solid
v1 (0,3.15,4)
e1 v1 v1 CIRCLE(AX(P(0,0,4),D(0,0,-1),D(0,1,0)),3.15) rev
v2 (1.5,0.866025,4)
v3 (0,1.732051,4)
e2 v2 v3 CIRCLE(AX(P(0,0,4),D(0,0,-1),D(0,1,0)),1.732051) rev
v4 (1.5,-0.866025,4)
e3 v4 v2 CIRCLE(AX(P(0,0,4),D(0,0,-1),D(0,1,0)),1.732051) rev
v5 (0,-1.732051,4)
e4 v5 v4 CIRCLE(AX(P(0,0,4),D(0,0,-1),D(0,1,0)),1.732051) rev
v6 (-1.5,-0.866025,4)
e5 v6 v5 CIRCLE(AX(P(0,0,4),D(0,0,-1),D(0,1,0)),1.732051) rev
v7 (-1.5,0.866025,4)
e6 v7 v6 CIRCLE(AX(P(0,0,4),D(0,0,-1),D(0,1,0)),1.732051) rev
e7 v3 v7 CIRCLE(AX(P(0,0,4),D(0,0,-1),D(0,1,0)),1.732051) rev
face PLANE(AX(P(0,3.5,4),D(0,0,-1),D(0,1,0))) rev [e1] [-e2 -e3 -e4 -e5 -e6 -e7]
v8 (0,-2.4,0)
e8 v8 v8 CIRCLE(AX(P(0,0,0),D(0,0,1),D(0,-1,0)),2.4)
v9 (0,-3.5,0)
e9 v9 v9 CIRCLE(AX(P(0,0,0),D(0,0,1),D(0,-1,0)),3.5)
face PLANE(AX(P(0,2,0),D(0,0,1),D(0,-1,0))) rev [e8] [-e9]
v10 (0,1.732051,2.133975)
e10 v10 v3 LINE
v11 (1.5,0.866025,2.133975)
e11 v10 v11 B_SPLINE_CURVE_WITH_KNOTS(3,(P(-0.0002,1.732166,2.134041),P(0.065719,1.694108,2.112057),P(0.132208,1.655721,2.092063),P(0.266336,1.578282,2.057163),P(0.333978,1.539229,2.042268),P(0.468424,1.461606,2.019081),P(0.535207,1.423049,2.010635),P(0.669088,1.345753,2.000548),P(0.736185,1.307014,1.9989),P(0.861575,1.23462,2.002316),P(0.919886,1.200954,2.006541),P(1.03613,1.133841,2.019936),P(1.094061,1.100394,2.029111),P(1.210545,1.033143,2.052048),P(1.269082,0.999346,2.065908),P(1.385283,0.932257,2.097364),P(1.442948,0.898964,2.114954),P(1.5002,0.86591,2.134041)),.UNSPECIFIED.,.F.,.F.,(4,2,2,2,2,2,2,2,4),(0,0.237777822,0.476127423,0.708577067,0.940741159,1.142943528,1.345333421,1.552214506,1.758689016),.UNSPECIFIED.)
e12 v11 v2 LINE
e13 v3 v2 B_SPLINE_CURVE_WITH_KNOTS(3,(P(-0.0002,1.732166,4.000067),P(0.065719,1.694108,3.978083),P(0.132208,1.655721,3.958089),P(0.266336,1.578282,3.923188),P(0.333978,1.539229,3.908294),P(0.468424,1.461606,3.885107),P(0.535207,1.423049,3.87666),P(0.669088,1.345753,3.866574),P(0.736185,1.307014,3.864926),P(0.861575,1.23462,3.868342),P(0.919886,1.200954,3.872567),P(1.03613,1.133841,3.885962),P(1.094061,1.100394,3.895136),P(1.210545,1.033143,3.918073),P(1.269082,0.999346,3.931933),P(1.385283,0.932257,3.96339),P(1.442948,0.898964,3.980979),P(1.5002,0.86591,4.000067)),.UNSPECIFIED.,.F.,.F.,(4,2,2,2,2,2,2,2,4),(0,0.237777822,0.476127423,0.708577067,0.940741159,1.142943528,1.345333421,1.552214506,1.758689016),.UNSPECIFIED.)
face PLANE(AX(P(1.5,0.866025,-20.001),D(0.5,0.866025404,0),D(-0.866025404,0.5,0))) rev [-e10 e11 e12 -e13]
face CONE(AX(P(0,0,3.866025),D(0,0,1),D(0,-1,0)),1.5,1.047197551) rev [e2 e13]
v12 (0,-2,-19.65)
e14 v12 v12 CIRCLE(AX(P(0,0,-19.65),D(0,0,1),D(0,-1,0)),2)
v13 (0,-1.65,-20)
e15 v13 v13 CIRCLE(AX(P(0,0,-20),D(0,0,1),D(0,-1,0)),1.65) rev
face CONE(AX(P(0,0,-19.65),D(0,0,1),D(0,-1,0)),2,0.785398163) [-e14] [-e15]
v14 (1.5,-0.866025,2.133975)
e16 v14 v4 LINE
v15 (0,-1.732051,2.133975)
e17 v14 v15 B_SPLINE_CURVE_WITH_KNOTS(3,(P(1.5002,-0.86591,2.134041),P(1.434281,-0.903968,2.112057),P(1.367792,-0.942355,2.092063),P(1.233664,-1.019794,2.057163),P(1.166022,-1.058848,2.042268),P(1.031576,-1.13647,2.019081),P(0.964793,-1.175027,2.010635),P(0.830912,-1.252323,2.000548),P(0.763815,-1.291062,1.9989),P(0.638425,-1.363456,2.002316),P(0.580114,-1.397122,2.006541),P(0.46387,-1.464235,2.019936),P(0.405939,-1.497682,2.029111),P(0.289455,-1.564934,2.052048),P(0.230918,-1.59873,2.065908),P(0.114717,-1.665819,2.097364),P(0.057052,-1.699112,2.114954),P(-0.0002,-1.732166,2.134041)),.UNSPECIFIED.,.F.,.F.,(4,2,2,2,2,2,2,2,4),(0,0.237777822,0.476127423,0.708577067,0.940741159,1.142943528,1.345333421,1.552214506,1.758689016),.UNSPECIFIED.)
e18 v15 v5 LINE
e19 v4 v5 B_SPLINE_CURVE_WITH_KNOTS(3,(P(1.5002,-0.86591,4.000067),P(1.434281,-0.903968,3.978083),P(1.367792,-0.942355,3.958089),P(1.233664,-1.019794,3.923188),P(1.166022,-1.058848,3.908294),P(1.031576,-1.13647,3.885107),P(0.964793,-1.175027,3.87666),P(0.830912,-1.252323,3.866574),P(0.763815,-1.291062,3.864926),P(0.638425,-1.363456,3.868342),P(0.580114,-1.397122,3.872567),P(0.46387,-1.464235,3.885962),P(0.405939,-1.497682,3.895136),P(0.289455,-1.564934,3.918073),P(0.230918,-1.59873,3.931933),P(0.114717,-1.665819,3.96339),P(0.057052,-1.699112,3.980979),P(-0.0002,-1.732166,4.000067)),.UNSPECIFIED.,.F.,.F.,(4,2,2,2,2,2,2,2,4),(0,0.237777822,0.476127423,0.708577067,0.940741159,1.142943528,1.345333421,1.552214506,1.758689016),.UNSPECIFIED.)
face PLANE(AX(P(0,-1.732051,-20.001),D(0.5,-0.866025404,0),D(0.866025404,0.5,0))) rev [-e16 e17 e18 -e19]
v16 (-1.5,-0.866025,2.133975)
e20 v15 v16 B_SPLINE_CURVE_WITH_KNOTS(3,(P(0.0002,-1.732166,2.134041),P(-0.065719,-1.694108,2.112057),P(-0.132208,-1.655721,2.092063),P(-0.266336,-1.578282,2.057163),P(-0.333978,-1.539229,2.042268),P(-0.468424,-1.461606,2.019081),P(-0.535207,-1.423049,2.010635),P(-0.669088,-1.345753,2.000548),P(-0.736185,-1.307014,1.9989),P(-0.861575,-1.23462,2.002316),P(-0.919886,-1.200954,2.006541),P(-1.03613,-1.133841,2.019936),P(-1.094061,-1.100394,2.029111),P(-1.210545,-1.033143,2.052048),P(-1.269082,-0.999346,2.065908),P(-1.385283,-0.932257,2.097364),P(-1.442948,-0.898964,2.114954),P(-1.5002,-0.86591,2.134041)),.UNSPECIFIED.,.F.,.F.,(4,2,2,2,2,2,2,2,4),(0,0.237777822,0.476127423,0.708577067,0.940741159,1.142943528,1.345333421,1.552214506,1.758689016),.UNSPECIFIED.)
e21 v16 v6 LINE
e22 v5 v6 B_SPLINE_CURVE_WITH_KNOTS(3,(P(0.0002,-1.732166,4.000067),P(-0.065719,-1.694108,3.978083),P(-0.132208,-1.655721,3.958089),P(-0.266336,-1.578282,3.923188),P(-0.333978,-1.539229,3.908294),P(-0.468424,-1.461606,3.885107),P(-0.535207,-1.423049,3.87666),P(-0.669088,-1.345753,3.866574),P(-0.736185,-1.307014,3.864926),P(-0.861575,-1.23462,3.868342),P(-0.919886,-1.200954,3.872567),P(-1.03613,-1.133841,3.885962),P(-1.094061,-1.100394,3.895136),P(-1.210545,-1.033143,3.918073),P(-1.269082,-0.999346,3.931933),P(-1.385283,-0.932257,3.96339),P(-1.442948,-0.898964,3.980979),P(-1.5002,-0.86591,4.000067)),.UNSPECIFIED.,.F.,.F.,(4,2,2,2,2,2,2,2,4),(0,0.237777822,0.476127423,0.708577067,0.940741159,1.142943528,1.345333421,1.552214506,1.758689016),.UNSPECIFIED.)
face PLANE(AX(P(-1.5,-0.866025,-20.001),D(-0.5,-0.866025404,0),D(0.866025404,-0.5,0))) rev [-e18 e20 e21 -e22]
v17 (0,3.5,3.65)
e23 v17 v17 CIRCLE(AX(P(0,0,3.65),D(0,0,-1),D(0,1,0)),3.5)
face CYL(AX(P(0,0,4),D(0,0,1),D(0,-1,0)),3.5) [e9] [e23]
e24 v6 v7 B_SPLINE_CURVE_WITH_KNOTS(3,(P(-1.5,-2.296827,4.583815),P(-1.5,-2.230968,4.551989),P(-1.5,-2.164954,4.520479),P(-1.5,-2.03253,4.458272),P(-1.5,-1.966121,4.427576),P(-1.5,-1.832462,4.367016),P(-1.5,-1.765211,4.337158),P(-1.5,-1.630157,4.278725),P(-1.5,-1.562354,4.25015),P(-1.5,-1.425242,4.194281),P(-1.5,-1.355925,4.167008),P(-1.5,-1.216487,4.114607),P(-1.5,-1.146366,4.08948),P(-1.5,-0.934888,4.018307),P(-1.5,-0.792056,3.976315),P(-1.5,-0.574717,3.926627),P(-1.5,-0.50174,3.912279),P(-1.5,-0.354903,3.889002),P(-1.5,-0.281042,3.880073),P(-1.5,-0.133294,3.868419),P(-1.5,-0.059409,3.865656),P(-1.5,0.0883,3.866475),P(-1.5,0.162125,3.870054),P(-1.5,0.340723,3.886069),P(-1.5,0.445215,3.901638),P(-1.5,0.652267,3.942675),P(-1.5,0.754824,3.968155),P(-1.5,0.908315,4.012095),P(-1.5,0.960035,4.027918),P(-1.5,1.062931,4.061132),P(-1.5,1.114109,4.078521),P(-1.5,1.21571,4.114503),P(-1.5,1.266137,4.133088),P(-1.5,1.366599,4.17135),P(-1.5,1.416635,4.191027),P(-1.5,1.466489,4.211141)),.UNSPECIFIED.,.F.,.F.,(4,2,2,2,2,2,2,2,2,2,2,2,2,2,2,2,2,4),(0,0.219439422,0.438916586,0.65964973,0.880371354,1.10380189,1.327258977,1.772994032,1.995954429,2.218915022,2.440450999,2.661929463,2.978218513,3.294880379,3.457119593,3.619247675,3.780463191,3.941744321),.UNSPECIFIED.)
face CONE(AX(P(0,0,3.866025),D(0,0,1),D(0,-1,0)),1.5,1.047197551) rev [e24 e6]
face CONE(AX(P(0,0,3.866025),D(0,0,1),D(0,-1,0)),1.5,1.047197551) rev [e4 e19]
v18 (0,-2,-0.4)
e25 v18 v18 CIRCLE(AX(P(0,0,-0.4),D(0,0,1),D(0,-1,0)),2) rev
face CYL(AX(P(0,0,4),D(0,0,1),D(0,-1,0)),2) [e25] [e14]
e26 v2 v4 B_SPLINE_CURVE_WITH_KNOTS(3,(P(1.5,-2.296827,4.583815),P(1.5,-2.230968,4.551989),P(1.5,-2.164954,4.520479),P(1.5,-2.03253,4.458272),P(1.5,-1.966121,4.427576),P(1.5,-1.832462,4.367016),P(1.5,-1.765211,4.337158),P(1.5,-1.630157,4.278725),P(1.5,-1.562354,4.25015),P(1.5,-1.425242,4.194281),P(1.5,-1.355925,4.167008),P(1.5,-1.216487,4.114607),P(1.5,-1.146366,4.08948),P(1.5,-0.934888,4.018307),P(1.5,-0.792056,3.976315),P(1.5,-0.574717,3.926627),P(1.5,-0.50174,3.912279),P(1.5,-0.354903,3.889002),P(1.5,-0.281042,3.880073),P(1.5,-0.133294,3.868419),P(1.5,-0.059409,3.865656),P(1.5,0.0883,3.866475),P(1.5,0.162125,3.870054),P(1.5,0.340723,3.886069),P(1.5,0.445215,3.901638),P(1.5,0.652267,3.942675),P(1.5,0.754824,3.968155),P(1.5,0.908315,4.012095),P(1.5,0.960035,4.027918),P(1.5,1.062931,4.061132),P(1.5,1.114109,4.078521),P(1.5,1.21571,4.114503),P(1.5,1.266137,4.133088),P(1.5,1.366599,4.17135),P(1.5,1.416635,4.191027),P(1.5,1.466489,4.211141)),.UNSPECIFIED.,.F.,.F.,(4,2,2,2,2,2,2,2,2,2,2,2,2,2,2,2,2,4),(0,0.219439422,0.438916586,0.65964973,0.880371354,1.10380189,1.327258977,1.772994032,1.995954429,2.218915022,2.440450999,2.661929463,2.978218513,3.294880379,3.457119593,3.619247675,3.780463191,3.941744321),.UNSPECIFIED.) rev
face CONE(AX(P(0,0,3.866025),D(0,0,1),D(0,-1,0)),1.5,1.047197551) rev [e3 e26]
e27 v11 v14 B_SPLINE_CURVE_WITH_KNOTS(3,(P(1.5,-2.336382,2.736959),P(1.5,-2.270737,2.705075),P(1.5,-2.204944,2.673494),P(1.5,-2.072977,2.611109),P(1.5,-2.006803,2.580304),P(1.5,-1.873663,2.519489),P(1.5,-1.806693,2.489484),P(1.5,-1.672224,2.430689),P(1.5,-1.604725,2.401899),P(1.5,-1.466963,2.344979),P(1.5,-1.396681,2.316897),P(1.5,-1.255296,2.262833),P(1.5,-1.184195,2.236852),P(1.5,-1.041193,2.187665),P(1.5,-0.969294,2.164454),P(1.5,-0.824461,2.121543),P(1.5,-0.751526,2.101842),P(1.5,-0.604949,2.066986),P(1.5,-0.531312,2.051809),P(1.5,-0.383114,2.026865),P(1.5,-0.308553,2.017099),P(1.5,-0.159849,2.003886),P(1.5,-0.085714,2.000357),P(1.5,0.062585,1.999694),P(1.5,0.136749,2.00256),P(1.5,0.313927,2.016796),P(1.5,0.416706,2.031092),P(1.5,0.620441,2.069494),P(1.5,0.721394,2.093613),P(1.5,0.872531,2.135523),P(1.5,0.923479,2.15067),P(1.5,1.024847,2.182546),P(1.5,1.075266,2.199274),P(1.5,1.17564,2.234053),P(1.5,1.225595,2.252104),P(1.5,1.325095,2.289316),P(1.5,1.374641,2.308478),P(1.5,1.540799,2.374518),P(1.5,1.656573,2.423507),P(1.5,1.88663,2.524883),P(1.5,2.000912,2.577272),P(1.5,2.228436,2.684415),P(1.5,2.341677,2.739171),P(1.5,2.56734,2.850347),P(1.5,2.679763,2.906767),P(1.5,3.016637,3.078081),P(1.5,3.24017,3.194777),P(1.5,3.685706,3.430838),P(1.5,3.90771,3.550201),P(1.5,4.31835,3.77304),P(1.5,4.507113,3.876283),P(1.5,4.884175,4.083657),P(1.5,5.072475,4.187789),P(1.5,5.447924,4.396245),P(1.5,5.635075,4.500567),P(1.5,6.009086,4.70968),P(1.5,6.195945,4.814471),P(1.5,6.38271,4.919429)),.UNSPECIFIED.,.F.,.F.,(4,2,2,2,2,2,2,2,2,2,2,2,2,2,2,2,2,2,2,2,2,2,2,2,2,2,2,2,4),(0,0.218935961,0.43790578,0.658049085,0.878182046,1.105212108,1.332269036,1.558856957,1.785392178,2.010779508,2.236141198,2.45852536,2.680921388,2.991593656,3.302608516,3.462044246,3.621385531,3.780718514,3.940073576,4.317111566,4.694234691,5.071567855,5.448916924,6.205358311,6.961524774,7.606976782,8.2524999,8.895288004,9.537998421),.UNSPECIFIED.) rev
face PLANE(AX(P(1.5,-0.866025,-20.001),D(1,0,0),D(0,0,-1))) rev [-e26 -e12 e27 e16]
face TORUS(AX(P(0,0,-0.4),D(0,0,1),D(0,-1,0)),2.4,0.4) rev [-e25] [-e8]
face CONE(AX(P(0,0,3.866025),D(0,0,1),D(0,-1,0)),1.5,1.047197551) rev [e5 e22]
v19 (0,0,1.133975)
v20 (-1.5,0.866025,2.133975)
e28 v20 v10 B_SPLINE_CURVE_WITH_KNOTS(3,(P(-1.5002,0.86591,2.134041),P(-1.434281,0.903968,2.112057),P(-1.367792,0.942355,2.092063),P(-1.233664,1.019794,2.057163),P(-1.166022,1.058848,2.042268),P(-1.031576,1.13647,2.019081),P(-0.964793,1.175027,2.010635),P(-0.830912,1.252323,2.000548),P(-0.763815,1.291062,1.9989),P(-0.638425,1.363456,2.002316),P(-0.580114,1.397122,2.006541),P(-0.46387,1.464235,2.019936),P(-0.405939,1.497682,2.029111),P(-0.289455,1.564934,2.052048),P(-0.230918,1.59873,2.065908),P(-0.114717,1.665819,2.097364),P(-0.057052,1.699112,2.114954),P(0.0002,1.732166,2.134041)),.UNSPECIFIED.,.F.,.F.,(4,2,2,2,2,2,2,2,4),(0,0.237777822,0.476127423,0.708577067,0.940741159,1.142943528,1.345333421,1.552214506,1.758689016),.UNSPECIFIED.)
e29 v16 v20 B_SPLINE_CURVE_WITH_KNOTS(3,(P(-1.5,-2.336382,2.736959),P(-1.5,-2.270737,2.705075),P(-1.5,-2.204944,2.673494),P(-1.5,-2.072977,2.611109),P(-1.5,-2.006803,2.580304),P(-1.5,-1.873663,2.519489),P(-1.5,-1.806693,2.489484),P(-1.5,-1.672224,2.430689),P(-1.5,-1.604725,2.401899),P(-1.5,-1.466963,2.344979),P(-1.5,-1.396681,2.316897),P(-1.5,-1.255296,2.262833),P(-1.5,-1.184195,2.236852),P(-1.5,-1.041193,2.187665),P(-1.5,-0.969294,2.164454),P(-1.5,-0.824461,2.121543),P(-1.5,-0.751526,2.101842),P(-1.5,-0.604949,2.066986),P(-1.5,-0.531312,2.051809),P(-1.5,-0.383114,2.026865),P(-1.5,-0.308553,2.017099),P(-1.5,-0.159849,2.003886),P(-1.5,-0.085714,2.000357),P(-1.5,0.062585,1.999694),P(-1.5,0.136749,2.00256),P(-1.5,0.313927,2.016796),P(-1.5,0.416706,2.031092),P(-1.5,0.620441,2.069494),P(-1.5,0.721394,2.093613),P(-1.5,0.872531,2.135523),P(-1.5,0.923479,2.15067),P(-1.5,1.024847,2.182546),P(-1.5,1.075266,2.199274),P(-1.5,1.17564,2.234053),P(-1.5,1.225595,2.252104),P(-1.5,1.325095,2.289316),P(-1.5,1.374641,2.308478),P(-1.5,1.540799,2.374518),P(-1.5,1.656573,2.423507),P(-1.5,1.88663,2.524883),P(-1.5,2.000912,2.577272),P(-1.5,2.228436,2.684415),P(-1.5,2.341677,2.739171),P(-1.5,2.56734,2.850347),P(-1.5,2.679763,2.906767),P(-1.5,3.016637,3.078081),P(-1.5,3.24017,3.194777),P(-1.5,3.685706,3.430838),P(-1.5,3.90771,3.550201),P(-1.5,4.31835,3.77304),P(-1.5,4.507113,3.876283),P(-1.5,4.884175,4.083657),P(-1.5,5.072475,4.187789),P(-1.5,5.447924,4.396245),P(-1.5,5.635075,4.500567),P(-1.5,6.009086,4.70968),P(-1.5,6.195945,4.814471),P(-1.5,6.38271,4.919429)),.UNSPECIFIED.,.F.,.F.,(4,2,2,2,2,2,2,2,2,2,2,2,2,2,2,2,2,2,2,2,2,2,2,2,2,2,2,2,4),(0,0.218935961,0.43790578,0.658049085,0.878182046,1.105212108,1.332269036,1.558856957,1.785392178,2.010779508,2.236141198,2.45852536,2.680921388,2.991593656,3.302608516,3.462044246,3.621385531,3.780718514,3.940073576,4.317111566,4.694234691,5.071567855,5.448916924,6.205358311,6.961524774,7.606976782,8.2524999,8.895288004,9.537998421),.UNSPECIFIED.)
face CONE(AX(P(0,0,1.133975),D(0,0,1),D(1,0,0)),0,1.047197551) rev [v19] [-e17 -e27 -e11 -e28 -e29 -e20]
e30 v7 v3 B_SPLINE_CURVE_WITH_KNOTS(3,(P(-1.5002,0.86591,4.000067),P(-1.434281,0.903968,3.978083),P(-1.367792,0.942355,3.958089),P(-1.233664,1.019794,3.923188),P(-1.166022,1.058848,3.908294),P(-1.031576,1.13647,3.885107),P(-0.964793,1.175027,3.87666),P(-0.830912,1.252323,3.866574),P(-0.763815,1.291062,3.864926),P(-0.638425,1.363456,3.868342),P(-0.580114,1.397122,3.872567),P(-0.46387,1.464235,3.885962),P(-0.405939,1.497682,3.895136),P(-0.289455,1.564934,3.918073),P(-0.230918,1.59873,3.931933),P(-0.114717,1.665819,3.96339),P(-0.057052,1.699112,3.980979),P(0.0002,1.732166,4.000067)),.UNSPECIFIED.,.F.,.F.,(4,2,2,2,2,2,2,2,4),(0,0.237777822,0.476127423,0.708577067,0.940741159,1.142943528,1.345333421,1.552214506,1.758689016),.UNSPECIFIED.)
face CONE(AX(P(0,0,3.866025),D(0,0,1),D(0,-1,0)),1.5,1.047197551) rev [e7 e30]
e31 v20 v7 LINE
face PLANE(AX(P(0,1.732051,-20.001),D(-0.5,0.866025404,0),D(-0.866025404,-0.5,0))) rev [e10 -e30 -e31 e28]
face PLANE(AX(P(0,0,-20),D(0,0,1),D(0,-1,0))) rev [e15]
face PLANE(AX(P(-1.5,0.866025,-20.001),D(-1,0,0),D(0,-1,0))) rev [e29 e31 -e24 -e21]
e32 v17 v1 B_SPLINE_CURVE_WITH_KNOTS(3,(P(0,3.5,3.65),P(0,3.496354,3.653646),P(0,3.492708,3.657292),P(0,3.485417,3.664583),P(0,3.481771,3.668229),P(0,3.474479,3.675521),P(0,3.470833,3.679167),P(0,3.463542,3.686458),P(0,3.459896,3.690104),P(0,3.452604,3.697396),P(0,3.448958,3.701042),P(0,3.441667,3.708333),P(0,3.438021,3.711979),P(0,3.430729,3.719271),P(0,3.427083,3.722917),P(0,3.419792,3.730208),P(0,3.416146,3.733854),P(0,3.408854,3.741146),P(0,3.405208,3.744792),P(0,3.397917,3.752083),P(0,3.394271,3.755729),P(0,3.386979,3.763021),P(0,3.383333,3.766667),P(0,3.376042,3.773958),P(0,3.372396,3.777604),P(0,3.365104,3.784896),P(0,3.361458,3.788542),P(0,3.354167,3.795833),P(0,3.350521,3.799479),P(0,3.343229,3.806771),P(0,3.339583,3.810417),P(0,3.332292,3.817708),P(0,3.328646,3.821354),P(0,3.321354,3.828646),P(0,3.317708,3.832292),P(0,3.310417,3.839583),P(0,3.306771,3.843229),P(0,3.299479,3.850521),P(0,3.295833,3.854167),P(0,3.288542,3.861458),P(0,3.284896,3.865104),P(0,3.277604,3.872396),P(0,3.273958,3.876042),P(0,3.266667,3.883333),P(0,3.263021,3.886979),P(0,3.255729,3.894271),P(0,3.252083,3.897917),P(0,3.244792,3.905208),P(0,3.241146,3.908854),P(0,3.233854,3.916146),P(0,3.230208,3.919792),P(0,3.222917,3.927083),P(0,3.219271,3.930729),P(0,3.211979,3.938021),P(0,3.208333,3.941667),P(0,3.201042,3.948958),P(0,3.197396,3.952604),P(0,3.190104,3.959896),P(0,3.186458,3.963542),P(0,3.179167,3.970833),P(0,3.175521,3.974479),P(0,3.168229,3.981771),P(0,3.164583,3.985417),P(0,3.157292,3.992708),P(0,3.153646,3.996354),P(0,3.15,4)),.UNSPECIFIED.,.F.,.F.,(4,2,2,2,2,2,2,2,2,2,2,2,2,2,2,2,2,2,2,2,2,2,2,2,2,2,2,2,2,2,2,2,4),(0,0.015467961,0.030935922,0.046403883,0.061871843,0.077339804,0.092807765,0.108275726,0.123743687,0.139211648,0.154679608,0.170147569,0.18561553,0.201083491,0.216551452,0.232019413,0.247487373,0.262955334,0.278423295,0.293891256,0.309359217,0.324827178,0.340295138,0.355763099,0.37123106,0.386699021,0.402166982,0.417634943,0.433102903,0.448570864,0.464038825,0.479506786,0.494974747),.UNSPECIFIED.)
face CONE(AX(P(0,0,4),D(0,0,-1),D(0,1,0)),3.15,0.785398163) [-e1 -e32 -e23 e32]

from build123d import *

# Parameters (mm, degrees)
CHAMFER1_SIZE      = 0.35
CUT_EXTRUDE1_REACH = 26.505
FILLET2_R          = 0.4


with BuildPart() as part:
    # Sketch1 → Revolve1 (revolve)
    with BuildSketch(Plane(origin=(0, 0, 0), x_dir=(0, 0, -1), z_dir=(1, 0, 0))):
        Polygon((0, 3.5), (-4, 3.5), (-4, 0), (20, 0), (20, 2), (0, 2), align=None)
    revolve(axis=Axis((0, 0, 4), (0, 0, -1)))

    # Sketch7 → Cut-Revolve2 (revolve, cut)
    with BuildSketch(Plane(origin=(0, 0, 0), x_dir=(0, 0, -1), z_dir=(1, 0, 0))):
        Polygon((-4, 0), (-4, 1.5), (-2, 1.5), (-1.133974596, 0), align=None)
    revolve(axis=Axis((0, 0, 4), (0, 0, -1)), mode=Mode.SUBTRACT)

    # Chamfer1
    chamfer1_edges = [part.edges().sort_by_distance(p)[0] for p in [
        (0, -2, -20),
        (0, -3.5, 4),
    ]]
    chamfer(chamfer1_edges, length=CHAMFER1_SIZE)

    # Cut-Extrude1: up to this cone (the profile starts inside it)
    cut_extrude1_end = Plane(origin=(0, 0, 4), z_dir=(0, 0, 1)).offset(-2.866024404) * Cone(1.732e-06, 60.336209885, 34.835126019, align=(Align.CENTER, Align.CENTER, Align.MIN), mode=Mode.PRIVATE)
    # Sketch8 → Cut-Extrude1 (cut, up to the surface)
    with BuildSketch(Plane.XY.offset(4), mode=Mode.PRIVATE) as cut_extrude1_sk1:
        Polygon((0, 1.732050808), (-1.5, 0.866025404), (-1.5, -0.866025404), (0, -1.732050808), (1.5, -0.866025404), (1.5, 0.866025404), align=None)
    cut_extrude1_tool1 = extrude(cut_extrude1_sk1.sketch, amount=-CUT_EXTRUDE1_REACH, mode=Mode.PRIVATE) & cut_extrude1_end
    add(cut_extrude1_tool1.solids().sort_by_distance((0, 0, 4))[0], mode=Mode.SUBTRACT)

    # Sketch9 → Cut-Revolve3 (revolve, cut)
    with BuildSketch(Plane(origin=(0, 0, 0), x_dir=(0, 0, -1), z_dir=(1, 0, 0))):
        Polygon((-4.5, 2.598076211), (-4.5, 1.5), (-3.866025404, 1.5), align=None)
    revolve(axis=Axis((0, 0, 4), (0, 0, -1)), mode=Mode.SUBTRACT)

    # Fillet2
    fillet2_edges = [part.edges().sort_by_distance(p)[0] for p in [
        (0, -2, 0),
    ]]
    fillet(fillet2_edges, radius=FILLET2_R)


solid = part.part
